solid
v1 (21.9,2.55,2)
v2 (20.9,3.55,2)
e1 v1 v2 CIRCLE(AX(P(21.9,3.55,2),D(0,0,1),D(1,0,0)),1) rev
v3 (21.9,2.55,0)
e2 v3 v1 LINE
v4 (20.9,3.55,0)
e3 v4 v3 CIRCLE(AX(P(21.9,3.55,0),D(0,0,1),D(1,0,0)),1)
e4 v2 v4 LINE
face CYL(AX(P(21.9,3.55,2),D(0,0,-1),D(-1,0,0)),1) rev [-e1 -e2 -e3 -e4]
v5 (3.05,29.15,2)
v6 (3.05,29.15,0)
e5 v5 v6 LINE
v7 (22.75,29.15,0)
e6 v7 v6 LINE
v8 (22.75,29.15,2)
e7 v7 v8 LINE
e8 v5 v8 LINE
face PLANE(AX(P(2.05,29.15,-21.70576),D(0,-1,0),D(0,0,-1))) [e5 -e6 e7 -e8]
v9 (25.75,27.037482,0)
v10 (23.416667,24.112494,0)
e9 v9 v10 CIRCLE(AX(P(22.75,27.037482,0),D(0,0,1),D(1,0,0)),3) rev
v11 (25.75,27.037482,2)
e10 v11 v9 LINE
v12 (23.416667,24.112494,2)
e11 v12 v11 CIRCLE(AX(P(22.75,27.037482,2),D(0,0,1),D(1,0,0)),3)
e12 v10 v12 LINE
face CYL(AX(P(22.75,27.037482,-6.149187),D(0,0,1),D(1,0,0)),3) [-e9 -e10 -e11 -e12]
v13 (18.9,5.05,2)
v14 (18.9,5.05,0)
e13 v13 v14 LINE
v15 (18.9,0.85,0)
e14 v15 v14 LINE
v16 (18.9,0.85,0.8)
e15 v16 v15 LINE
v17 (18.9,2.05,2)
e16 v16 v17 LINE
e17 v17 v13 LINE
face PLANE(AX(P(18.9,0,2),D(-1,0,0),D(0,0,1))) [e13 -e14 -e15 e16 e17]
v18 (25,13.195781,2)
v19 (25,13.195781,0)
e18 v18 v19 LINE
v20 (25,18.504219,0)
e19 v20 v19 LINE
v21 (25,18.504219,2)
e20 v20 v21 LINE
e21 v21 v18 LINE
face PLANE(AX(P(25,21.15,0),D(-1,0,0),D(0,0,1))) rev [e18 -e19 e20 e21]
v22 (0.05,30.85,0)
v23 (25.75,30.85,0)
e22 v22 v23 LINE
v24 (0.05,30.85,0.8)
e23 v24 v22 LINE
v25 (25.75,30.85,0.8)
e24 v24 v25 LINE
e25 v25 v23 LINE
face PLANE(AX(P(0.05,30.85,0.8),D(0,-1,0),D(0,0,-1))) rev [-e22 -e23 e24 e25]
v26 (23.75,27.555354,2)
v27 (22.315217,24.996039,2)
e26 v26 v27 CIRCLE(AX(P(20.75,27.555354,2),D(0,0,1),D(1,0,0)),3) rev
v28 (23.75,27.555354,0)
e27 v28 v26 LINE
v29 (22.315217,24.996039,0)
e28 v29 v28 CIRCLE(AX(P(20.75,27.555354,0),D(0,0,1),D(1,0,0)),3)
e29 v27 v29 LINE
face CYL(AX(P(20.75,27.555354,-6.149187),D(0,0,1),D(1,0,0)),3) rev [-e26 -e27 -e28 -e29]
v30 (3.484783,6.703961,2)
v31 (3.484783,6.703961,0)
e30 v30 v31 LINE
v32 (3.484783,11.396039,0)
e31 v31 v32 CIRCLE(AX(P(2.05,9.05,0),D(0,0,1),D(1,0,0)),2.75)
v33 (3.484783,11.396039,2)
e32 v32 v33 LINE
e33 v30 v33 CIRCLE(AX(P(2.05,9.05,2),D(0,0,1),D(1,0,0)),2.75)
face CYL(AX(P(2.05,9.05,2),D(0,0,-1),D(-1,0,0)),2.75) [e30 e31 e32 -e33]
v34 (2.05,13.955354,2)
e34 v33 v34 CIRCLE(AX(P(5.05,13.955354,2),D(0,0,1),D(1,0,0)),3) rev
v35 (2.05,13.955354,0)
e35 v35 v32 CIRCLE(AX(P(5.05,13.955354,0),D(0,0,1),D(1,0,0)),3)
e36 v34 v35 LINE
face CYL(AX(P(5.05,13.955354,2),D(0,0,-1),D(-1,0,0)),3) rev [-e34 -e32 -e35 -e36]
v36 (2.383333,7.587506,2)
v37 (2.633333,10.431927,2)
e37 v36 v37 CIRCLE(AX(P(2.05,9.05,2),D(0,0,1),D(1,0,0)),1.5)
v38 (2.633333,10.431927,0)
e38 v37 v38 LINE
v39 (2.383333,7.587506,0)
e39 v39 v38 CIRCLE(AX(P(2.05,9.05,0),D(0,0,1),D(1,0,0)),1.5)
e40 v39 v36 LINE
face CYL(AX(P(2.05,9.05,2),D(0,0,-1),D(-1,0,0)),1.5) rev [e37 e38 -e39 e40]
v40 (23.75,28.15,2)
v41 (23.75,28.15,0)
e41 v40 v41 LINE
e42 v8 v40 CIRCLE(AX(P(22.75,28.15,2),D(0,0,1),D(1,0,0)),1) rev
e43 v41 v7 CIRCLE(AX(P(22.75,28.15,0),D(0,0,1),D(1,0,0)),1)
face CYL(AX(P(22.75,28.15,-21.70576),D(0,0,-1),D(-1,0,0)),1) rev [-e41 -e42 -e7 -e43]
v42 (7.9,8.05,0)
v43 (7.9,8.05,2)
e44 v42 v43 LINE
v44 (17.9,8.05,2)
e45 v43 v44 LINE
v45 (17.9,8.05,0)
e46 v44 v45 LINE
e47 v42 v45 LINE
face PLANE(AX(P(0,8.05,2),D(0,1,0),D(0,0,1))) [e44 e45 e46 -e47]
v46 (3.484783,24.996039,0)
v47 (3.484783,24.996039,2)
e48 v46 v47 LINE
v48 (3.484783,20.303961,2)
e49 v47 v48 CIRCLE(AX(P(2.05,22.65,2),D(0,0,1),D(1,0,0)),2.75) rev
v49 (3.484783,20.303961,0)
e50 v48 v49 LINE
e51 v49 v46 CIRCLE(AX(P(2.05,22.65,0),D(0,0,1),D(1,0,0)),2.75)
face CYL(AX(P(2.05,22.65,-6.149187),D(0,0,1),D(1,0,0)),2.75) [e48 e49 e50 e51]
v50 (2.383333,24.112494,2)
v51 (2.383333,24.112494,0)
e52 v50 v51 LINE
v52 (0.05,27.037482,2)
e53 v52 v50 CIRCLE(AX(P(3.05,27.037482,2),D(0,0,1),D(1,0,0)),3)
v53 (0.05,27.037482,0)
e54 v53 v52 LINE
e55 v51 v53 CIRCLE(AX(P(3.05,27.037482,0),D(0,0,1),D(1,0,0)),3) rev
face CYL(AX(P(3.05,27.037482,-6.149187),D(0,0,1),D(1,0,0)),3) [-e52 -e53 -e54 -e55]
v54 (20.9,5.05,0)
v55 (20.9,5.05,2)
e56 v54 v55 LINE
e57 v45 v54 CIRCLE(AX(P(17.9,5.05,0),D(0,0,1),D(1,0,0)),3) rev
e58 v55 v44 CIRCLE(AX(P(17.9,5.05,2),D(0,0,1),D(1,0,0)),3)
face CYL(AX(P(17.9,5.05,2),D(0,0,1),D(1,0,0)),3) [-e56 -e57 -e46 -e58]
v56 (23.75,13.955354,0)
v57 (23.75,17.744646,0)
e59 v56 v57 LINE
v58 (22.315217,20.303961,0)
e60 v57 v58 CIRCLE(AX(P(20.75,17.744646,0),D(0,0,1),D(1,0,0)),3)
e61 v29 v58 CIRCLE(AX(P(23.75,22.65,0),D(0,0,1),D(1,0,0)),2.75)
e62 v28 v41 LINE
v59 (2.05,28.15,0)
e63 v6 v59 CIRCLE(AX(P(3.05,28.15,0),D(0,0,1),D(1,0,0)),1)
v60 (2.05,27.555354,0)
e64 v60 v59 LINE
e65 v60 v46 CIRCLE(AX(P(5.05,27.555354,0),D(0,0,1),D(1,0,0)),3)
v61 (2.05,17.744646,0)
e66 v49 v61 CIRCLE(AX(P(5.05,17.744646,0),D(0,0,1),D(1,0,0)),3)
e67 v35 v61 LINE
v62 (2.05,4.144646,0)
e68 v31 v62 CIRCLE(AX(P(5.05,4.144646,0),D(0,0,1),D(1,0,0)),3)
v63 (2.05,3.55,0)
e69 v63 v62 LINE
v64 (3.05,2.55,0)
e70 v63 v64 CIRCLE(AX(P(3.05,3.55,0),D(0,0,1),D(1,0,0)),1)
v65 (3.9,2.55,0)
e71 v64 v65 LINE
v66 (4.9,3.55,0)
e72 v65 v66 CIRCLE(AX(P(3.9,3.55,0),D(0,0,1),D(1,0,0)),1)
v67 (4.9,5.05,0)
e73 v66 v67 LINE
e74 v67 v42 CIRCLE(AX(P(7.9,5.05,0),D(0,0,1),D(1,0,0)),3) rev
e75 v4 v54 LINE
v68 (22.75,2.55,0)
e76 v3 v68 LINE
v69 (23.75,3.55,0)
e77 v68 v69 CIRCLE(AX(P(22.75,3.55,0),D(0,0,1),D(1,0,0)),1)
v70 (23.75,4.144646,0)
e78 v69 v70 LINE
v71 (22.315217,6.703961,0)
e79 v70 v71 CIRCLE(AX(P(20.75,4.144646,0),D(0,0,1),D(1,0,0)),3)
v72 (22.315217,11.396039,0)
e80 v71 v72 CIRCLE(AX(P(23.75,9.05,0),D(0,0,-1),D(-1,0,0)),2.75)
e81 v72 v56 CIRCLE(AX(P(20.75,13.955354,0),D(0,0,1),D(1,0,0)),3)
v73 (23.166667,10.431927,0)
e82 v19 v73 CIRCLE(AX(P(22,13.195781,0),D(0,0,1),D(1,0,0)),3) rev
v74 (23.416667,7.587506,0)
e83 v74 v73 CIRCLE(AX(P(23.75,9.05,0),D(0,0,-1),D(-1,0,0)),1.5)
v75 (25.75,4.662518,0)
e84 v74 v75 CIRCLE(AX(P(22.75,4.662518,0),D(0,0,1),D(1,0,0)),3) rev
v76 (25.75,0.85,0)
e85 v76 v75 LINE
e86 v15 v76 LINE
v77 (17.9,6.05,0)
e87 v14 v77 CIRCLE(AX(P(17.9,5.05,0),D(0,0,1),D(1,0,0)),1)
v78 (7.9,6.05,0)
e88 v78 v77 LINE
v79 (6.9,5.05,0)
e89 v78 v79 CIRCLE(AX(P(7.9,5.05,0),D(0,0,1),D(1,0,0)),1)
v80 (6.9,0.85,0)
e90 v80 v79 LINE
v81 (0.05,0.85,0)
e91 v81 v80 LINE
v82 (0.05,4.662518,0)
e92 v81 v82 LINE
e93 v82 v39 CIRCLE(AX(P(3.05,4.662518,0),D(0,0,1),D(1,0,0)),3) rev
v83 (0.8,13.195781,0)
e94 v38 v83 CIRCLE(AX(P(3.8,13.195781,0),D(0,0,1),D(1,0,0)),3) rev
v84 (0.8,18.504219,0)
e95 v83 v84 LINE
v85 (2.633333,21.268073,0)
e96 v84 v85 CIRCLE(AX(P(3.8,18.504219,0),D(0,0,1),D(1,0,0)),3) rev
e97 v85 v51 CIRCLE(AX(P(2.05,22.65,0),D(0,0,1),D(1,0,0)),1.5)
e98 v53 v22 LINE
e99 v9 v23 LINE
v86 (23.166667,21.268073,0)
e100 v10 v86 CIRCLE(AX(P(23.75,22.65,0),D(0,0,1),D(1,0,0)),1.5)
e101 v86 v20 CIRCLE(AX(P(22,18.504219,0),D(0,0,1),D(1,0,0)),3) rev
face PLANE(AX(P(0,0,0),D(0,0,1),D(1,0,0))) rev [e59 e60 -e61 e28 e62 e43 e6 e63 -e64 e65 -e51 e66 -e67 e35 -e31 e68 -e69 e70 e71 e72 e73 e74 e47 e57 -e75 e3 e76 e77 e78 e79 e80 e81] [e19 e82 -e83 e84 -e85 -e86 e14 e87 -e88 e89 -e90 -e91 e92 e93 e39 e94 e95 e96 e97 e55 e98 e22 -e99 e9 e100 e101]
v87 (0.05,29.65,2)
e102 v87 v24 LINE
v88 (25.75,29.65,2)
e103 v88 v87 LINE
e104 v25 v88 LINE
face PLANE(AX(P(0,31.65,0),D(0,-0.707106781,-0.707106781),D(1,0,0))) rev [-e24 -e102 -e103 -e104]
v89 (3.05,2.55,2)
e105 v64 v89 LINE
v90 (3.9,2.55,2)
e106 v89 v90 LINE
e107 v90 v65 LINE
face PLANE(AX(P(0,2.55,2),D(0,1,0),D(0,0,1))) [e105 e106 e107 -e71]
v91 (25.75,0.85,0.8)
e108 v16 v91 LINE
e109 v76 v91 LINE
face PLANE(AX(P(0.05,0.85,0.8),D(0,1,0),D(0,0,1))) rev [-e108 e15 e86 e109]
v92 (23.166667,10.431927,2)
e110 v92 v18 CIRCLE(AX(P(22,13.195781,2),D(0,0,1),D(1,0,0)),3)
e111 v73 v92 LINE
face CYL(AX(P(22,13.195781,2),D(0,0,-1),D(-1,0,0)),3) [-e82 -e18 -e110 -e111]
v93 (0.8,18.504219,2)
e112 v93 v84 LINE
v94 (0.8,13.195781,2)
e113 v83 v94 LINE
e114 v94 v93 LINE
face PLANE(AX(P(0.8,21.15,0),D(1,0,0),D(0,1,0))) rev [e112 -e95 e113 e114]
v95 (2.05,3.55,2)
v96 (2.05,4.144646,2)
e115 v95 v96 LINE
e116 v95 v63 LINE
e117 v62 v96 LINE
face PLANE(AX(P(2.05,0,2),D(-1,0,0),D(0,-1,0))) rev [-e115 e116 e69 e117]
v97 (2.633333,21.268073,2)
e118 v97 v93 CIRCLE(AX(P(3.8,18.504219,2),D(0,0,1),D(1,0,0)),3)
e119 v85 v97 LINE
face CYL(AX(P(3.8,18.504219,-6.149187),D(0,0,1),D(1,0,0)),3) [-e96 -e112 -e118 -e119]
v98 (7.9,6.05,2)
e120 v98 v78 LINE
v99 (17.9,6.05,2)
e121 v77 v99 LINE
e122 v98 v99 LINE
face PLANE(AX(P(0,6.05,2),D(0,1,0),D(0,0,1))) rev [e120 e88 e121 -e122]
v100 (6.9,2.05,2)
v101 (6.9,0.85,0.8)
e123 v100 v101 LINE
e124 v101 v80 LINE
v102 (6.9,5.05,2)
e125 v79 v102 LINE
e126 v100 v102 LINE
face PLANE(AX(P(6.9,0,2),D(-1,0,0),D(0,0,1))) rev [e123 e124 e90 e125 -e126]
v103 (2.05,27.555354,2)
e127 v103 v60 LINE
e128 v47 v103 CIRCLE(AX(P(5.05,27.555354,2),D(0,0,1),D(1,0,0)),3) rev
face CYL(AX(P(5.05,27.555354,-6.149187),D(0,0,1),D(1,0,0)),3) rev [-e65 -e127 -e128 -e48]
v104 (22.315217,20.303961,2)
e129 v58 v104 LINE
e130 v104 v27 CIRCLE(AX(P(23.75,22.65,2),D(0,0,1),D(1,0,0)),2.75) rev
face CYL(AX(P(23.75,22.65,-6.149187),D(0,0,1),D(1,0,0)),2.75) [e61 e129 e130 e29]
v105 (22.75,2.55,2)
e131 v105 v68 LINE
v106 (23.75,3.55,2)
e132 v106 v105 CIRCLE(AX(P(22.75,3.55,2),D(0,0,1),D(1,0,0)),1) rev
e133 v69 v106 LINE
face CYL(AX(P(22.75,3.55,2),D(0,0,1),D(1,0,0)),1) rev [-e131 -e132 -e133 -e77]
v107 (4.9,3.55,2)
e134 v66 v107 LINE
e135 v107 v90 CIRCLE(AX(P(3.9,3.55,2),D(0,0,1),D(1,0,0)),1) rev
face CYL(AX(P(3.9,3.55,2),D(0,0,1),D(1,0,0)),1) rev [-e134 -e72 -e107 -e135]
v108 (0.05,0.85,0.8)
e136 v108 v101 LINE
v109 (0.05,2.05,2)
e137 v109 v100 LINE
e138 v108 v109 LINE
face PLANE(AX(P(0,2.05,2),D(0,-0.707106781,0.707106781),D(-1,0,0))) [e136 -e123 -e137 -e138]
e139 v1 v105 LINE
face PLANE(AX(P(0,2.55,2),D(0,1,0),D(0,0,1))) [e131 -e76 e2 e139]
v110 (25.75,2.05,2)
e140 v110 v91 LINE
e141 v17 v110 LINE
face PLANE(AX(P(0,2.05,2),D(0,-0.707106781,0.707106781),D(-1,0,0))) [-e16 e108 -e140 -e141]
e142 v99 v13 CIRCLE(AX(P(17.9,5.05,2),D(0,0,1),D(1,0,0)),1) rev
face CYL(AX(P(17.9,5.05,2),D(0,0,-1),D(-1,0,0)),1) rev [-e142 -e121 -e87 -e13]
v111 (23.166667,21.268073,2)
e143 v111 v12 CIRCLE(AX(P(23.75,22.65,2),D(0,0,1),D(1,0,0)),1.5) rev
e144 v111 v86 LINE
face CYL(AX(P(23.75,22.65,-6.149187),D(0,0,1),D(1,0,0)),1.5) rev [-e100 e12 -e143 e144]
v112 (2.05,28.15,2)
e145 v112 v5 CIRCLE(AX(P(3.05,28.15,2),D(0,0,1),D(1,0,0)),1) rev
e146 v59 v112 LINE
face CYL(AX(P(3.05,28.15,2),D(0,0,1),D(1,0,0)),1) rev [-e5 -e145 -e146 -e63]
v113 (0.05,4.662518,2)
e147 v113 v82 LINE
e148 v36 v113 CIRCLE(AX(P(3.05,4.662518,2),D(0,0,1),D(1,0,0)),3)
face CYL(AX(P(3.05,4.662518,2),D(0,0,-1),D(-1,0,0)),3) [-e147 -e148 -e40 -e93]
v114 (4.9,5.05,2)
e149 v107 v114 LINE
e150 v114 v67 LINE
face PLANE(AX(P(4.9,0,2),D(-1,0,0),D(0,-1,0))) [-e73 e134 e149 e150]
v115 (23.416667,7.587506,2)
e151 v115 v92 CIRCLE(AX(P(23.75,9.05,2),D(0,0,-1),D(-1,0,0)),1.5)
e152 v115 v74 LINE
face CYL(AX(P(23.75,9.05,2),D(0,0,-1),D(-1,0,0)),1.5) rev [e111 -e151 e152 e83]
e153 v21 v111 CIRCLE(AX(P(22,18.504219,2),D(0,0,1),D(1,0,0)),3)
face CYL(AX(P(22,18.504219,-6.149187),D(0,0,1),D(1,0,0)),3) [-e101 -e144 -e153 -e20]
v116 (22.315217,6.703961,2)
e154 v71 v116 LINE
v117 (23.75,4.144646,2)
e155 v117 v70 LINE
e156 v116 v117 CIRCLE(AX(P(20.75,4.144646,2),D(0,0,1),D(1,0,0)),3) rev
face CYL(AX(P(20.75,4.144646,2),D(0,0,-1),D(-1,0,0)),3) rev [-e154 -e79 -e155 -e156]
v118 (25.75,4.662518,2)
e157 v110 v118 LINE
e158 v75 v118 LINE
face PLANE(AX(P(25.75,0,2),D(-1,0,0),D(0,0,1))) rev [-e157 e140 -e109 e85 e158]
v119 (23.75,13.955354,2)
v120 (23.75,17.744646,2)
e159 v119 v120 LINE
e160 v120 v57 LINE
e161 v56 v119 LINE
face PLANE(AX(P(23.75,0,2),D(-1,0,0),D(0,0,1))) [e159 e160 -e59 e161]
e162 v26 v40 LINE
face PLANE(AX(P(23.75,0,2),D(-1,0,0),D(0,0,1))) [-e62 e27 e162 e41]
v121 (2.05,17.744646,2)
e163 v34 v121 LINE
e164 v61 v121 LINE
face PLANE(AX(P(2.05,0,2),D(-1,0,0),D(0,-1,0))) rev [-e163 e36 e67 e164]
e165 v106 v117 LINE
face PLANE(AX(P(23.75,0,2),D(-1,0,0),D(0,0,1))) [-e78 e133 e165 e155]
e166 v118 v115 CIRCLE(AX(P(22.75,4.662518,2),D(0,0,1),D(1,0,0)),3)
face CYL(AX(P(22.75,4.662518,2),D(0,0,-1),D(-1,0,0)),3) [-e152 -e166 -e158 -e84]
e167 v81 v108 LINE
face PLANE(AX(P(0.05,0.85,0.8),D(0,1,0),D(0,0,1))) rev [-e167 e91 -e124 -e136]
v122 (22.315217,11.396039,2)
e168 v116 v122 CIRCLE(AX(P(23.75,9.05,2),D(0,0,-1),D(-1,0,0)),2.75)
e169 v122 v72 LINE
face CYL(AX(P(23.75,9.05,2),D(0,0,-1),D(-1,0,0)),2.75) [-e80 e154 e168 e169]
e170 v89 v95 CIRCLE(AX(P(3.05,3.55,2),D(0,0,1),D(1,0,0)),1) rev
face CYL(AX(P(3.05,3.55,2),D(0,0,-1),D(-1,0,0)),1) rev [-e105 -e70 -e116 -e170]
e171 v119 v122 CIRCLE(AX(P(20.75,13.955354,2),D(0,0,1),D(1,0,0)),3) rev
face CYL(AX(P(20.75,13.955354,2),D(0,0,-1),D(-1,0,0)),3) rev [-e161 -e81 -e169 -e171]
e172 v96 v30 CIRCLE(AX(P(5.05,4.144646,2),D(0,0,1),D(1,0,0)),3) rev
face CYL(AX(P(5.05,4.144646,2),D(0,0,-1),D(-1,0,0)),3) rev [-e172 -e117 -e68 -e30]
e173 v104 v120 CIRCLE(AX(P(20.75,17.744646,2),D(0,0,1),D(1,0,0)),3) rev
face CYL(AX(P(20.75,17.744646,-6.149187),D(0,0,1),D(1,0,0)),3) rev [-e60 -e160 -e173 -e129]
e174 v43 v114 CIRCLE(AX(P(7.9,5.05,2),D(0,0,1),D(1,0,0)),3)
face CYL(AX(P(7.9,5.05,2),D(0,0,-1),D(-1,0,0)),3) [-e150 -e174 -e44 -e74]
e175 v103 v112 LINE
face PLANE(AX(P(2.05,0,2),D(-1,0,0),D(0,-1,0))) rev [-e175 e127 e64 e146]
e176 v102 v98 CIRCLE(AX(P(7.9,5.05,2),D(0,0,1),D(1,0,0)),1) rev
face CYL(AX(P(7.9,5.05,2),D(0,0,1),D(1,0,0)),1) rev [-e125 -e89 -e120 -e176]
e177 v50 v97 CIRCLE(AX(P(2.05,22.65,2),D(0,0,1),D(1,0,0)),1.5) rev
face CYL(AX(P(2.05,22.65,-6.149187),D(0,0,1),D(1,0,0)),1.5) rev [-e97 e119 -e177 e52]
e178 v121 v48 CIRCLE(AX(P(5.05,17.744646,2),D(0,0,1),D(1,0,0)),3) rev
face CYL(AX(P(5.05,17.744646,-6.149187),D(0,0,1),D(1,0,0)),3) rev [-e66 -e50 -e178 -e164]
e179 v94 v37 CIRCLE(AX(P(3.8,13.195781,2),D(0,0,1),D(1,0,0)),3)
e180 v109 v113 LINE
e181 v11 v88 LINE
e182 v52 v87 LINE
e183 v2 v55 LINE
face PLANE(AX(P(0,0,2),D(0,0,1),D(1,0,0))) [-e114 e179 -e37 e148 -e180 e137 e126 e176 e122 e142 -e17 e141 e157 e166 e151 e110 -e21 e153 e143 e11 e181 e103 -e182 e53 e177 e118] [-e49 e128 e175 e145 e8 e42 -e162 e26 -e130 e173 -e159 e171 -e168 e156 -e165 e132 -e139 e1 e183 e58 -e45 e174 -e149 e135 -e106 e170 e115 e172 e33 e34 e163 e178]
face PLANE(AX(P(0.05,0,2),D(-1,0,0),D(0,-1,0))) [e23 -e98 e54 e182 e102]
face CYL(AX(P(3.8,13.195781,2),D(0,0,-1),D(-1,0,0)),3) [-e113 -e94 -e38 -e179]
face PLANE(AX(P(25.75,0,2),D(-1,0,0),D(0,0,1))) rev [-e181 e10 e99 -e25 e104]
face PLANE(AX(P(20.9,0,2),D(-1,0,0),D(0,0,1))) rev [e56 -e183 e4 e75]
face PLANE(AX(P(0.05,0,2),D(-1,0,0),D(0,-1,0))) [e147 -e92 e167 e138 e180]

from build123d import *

# Parameters (mm, degrees)
BOSS_EXTRUDE1_DEPTH  = 2
SKETCH3_W            = 21.7
SKETCH3_H            = 0.5
BOSS_EXTRUDE2_DEPTH  = 2
SKETCH2_W            = 2
SKETCH2_H            = 3
CUT_EXTRUDE1_DEPTH   = 2
CHAMFER1_SIZE        = 2
CHAMFER3_SIZE        = 2
BOSS_EXTRUDE3_DEPTH  = 2
SKETCH5_W            = 2
SKETCH5_H            = 3
CUT_EXTRUDE2_DEPTH   = 10
SKETCH8_W            = 0.75
SKETCH8_H            = 10.6
CUT_EXTRUDE5_DEPTH   = 41.850764987
FILLET2_R            = 1
FILLET3_R            = 3
FILLET4_R            = 3
CUT_EXTRUDE4_START   = 30.85
CUT_EXTRUDE4_DEPTH   = 0.8
CUT_EXTRUDE4_START_2 = 0.05
CUT_EXTRUDE4_2_DEPTH = 0.8


# Read off the part's stored shape, not the designer's step: Cut-Extrude4
with BuildPart() as part:
    # Sketch1 → Boss-Extrude1 (new body)
    with BuildSketch(Plane.XY):
        with BuildLine():
            ThreePointArc((2.05, 7.55), (3.55, 9.05), (2.05, 10.55))
            Line((2.05, 10.55), (0.05, 10.55))
            Line((0.05, 10.55), (0.05, 31.65))
            Line((0.05, 31.65), (25.75, 31.65))
            Line((25.75, 31.65), (25.75, 0.05))
            Line((25.75, 0.05), (18.9, 0.05))
            Line((18.9, 0.05), (18.9, 6.05))
            Line((18.9, 6.05), (6.9, 6.05))
            Line((6.9, 6.05), (6.9, 0.05))
            Line((6.9, 0.05), (0.05, 0.05))
            Line((0.05, 0.05), (0.05, 7.55))
            Line((0.05, 7.55), (2.05, 7.55))
        make_face()
        with BuildLine():
            Line((2.05, 2.55), (2.05, 6.3))
            ThreePointArc((2.05, 6.3), (4.8, 9.05), (2.05, 11.8))
            Line((2.05, 11.8), (2.05, 29.65))
            Line((2.05, 29.65), (23.75, 29.65))
            Line((23.75, 29.65), (23.75, 2.55))
            Line((23.75, 2.55), (20.9, 2.55))
            Line((20.9, 2.55), (20.9, 8.05))
            Line((20.9, 8.05), (4.9, 8.05))
            Line((4.9, 8.05), (4.9, 2.55))
            Line((4.9, 2.55), (2.05, 2.55))
        make_face(mode=Mode.SUBTRACT)
    boss_extrude1 = extrude(amount=BOSS_EXTRUDE1_DEPTH)

    # Mirror8: Boss-Extrude1 across plane
    add(boss_extrude1.mirror(Plane.ZY.offset(-12.9)))

    # Sketch3 → Boss-Extrude2 (add)
    with BuildSketch(Plane.XY.offset(2)):
        with Locations((12.9, 29.4)):
            Rectangle(SKETCH3_W, SKETCH3_H)
    extrude(amount=-BOSS_EXTRUDE2_DEPTH)

    # Sketch2 → Cut-Extrude1 (cut)
    with BuildSketch(Plane.XY.offset(2)):
        with Locations((1.05, 9.05)):
            Rectangle(SKETCH2_W, SKETCH2_H)
        with Locations((24.75, 9.05)):
            Rectangle(SKETCH2_W, SKETCH2_H)
    extrude(amount=-CUT_EXTRUDE1_DEPTH, mode=Mode.SUBTRACT)

    # Chamfer1
    chamfer1_edges = [part.edges().sort_by_distance(p)[0] for p in [
        (22.325, 0.05, 2),
        (3.475, 0.05, 2),
    ]]
    chamfer(chamfer1_edges, length=CHAMFER1_SIZE - 0.0001)  # a hair under: the kernel refuses the full size

    # Chamfer3
    chamfer3_edges = [part.edges().sort_by_distance(p)[0] for p in [
        (12.9, 31.65, 2),
    ]]
    chamfer(chamfer3_edges, length=CHAMFER3_SIZE - 0.0001)  # a hair under: the kernel refuses the full size

    # Sketch4 → Boss-Extrude3 (add)
    with BuildSketch(Plane.XY.offset(2)):
        with BuildLine():
            ThreePointArc((2.05, 19.9), (4.8, 22.65), (2.05, 25.4))
            Line((2.05, 25.4), (2.05, 24.15))
            ThreePointArc((2.05, 24.15), (3.55, 22.65), (2.05, 21.15))
            Line((2.05, 21.15), (2.05, 19.9))
        make_face()
        with BuildLine():
            Line((23.75, 24.15), (23.75, 25.4))
            ThreePointArc((23.75, 25.4), (21, 22.65), (23.75, 19.9))
            Line((23.75, 19.9), (23.75, 21.15))
            ThreePointArc((23.75, 21.15), (22.25, 22.65), (23.75, 24.15))
        make_face()
    extrude(amount=-BOSS_EXTRUDE3_DEPTH)

    # Sketch5 → Cut-Extrude2 (cut)
    with BuildSketch(Plane.XY.offset(2)):
        with Locations((1.05, 22.65)):
            Rectangle(SKETCH5_W, SKETCH5_H)
        with Locations((24.75, 22.65)):
            Rectangle(SKETCH5_W, SKETCH5_H)
    extrude(amount=-CUT_EXTRUDE2_DEPTH, mode=Mode.SUBTRACT)

    # Sketch8 → Cut-Extrude5 (cut, through all)
    with BuildSketch(Plane.XY.offset(2)):
        with Locations((25.375, 15.85)):
            Rectangle(SKETCH8_W, SKETCH8_H)
        with Locations((0.425, 15.85)):
            Rectangle(SKETCH8_W, SKETCH8_H)
    extrude(amount=-CUT_EXTRUDE5_DEPTH, mode=Mode.SUBTRACT)

    # Fillet2
    fillet2_edges = [part.edges().sort_by_distance(p)[0] for p in [
        (2.05, 29.15, 1),
        (23.75, 29.15, 1),
        (2.05, 2.55, 1),
        (4.9, 2.55, 1),
        (20.9, 2.55, 1),
        (23.75, 2.55, 1),
        (18.9, 6.05, 1),
        (6.9, 6.05, 1),
    ]]
    fillet(fillet2_edges, radius=FILLET2_R)

    # Fillet3
    fillet3_edges = [part.edges().sort_by_distance(p)[0] for p in [
        (23.75, 6.3, 1),
        (23.75, 11.8, 1),
        (25.75, 7.55, 1),
        (23.75, 25.4, 1),
        (23.75, 19.9, 1),
        (25.75, 24.15, 1),
        (2.05, 11.8, 1),
        (2.05, 6.3, 1),
        (0.05, 7.55, 1),
        (2.05, 19.9, 1),
        (2.05, 25.4, 1),
        (0.05, 24.15, 1),
        (0.8, 10.55, 1),
        (0.8, 21.15, 1),
        (25, 21.15, 1),
        (25, 10.55, 1),
    ]]
    fillet(fillet3_edges, radius=FILLET3_R)

    # Fillet4
    fillet4_edges = [part.edges().sort_by_distance(p)[0] for p in [
        (4.9, 8.05, 1),
        (20.9, 8.05, 1),
    ]]
    fillet(fillet4_edges, radius=FILLET4_R)

    # Cut-Extrude4 outline → Cut-Extrude4 (cut)
    with BuildSketch(Plane(origin=(0, 0, 0), x_dir=(1, 0, 0), z_dir=(0, 1, 0)).offset(CUT_EXTRUDE4_START)):
        Polygon((-1, 1), (-1, -2), (0.05, -2), (25.75, -2), (27, -2), (27, 1), align=None)
    extrude(amount=CUT_EXTRUDE4_DEPTH, mode=Mode.SUBTRACT)

    # Cut-Extrude4 2 outline → Cut-Extrude4 2 (cut)
    with BuildSketch(Plane(origin=(0, 0, 0), x_dir=(1, 0, 0), z_dir=(0, 1, 0)).offset(CUT_EXTRUDE4_START_2)):
        Polygon((6.9, -2), (6.9, 1), (-1, 1), (-1, -2), (0.05, -2), align=None)
        Polygon((18.9, 1), (18.9, -2), (25.75, -2), (27, -2), (27, 1), align=None)
    extrude(amount=CUT_EXTRUDE4_2_DEPTH, mode=Mode.SUBTRACT)


solid = part.part
